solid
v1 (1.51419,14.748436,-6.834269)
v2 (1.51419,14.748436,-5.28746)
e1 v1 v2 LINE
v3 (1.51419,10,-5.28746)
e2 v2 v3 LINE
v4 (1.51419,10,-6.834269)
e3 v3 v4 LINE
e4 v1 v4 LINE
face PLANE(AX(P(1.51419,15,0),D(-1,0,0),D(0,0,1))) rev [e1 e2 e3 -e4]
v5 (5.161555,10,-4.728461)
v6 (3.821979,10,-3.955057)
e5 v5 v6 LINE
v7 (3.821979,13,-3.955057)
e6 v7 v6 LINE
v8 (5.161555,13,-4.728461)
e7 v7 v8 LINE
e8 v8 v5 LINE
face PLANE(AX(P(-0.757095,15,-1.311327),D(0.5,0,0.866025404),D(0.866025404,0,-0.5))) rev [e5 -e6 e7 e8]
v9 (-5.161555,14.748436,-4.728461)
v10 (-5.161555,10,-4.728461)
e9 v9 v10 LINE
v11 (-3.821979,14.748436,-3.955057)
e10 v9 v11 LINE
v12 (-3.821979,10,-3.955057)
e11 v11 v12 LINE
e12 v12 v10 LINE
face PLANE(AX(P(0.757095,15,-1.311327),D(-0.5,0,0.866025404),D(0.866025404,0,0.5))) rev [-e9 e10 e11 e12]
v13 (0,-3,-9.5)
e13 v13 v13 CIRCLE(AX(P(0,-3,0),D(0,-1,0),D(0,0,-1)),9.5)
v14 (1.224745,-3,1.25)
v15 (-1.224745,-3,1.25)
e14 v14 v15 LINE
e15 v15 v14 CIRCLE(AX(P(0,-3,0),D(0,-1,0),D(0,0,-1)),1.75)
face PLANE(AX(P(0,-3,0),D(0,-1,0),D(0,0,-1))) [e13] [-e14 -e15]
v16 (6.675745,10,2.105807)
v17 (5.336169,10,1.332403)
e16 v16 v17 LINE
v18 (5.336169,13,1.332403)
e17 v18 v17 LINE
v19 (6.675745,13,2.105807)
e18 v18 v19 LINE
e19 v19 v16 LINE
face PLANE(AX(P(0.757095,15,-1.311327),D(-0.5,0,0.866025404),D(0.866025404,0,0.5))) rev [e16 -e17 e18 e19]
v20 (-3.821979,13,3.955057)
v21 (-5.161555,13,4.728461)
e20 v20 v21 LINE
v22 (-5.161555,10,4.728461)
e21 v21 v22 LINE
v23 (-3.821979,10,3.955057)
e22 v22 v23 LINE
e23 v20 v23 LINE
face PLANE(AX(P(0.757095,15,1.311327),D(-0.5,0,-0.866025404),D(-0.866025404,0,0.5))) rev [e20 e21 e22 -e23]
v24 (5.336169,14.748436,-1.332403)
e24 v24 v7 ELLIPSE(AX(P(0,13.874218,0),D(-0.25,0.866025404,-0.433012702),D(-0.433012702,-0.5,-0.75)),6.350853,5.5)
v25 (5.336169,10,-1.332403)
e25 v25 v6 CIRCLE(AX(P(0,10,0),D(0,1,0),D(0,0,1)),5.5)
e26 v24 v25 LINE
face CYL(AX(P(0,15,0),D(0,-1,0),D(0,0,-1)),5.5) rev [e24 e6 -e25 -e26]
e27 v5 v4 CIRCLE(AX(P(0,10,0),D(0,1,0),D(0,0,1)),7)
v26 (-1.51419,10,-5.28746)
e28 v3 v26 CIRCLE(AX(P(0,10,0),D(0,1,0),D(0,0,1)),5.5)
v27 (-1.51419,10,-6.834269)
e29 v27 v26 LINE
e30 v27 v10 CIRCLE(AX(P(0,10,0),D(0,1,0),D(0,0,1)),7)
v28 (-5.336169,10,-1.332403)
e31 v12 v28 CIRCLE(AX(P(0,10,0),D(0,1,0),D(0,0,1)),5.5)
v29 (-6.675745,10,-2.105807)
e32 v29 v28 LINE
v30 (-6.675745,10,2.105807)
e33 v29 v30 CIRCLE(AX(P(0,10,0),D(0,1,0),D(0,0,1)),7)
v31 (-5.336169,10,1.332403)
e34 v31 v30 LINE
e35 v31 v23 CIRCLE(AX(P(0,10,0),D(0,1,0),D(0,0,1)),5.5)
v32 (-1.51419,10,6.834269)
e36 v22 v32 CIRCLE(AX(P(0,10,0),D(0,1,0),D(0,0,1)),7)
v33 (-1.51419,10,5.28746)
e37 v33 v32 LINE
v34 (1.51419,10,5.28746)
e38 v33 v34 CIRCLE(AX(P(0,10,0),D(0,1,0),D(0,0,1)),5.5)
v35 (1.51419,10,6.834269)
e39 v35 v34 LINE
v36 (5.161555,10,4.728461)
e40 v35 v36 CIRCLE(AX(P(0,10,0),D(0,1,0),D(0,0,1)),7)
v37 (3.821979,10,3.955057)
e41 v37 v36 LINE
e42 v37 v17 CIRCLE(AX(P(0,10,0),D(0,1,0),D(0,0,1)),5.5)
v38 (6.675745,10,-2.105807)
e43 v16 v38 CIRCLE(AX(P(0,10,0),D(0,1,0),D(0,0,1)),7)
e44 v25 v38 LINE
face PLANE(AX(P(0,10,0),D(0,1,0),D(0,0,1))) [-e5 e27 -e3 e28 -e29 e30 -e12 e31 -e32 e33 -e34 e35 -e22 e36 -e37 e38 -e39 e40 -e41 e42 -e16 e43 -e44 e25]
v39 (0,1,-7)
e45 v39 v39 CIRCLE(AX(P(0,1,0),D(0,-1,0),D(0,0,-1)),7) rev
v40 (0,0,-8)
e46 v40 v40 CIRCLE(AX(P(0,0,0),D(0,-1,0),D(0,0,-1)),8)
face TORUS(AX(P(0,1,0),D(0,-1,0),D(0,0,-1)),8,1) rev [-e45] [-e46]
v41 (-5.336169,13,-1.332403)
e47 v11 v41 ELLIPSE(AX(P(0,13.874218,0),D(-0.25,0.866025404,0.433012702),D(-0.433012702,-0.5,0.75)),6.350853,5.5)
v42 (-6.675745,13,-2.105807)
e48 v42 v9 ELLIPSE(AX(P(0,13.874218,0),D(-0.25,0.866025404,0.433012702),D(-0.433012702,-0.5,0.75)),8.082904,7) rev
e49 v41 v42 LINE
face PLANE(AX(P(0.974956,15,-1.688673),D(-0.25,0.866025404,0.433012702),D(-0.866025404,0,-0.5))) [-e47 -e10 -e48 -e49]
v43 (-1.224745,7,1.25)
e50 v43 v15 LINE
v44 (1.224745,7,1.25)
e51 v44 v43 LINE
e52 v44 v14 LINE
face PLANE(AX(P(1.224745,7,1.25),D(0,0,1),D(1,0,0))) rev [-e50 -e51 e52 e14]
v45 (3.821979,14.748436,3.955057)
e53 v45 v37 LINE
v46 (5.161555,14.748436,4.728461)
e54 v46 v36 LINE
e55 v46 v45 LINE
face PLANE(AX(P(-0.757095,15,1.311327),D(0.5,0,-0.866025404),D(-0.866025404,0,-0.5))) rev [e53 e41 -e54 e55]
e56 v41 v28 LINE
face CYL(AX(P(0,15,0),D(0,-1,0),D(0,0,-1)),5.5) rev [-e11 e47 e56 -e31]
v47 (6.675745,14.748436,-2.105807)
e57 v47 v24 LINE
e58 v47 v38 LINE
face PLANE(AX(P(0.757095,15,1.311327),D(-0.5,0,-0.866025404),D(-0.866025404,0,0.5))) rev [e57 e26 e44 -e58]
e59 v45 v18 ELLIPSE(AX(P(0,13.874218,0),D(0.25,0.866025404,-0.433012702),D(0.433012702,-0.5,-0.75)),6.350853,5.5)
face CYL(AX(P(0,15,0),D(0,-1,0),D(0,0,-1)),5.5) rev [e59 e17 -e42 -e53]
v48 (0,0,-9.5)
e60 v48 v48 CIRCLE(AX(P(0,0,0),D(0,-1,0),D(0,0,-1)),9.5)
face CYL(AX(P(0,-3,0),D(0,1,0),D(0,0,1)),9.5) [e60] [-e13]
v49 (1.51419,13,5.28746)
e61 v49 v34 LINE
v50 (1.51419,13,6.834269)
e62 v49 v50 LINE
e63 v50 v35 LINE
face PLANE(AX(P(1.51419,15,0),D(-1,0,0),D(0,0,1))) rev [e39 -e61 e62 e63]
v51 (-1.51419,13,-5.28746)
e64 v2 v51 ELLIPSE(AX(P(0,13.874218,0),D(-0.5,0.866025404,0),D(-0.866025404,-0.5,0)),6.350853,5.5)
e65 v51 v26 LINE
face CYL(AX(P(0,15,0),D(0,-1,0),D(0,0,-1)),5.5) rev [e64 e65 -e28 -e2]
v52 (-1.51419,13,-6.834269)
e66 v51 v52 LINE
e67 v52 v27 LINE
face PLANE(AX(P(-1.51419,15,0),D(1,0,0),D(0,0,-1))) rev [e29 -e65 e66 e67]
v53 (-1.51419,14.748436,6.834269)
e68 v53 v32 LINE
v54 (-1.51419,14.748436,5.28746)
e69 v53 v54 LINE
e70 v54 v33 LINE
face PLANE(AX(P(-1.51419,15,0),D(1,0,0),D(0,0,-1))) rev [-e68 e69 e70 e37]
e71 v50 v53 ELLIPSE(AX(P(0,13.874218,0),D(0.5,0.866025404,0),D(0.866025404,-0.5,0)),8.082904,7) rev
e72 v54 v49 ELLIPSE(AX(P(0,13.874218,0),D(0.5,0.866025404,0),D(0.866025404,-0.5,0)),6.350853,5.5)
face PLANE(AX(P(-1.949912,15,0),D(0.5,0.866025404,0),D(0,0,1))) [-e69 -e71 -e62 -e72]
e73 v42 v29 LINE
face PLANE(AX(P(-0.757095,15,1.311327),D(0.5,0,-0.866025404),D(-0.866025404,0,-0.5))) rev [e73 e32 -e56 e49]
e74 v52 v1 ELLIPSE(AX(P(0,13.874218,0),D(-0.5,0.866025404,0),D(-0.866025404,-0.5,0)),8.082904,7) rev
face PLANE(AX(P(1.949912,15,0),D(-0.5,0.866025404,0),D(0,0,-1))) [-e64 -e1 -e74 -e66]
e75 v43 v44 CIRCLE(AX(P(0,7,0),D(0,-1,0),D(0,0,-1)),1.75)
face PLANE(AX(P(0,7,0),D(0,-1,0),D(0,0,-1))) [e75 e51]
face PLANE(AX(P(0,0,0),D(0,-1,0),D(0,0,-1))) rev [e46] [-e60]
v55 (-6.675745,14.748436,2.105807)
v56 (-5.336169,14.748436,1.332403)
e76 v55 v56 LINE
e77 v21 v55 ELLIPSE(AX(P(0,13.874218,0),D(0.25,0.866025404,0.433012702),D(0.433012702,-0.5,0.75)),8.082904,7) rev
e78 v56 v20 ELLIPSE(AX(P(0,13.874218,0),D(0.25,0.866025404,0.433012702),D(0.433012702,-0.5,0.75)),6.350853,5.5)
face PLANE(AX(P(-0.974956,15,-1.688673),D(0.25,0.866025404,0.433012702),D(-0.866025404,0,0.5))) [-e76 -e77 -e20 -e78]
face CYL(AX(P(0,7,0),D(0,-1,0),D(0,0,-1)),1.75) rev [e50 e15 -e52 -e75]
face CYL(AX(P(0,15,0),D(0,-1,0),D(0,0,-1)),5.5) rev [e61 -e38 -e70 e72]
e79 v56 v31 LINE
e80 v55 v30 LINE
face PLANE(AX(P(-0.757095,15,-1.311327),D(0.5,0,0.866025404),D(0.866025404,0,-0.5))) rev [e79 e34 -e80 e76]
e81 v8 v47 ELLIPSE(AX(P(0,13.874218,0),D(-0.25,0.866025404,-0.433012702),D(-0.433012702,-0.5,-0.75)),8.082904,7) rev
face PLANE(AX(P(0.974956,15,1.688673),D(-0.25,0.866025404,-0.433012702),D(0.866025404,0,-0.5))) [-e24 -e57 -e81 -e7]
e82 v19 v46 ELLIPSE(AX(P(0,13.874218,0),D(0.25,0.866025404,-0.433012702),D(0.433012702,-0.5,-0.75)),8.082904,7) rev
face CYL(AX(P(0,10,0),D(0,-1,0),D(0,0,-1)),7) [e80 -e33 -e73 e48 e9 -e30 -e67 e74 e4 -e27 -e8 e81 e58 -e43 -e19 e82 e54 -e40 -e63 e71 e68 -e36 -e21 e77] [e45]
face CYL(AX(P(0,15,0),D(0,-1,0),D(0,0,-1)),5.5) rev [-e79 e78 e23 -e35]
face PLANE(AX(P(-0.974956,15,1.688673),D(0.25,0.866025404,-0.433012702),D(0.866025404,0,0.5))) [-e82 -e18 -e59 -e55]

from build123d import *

# Parameters (mm, degrees)
SKETCH1_R           = 7
BOSS_EXTRUDE1_DEPTH = 10
BOSS_EXTRUDE3_DEPTH = 5
CHAMFER2_SIZE       = 2
CHAMFER2_SIZE_2     = 3.464101615
SKETCH7_R           = 9.5
BOSS_EXTRUDE4_DEPTH = 3
CUT_EXTRUDE1_DEPTH  = 10
FILLET1_R           = 1


with BuildPart() as part:
    # Sketch1 → Boss-Extrude1 (new body)
    with BuildSketch(Plane(origin=(0, 0, 0), x_dir=(1, 0, 0), z_dir=(0, 1, 0))):
        with Locations(Location((0, 0, 0), (0, 0, 270))):
            Circle(SKETCH1_R)
    extrude(amount=BOSS_EXTRUDE1_DEPTH)

    # Sketch5 → Boss-Extrude3 (add)
    with BuildSketch(Plane(origin=(0, 10, 0), x_dir=(1, 0, 0), z_dir=(0, 1, 0))):
        with BuildLine():
            Line((-3.821979409, 3.955056687), (-5.161555406, 4.72846125))
            ThreePointArc((-5.161555406, 4.72846125), (-6.062177826, 3.5), (-6.675745266, 2.10580748))
            Line((-6.675745266, 2.10580748), (-5.336169269, 1.332402917))
            ThreePointArc((-5.336169269, 1.332402917), (-4.763139721, 2.75), (-3.821979409, 3.955056687))
        make_face()
        with BuildLine():
            Line((1.51418986, 5.287459604), (1.51418986, 6.83426873))
            ThreePointArc((1.51418986, 6.83426873), (0, 7), (-1.51418986, 6.83426873))
            Line((-1.51418986, 6.83426873), (-1.51418986, 5.287459604))
            ThreePointArc((-1.51418986, 5.287459604), (0, 5.5), (1.51418986, 5.287459604))
        make_face()
        with BuildLine():
            ThreePointArc((6.675745266, 2.10580748), (6.062177826, 3.5), (5.161555406, 4.72846125))
            Line((5.161555406, 4.72846125), (3.821979409, 3.955056687))
            ThreePointArc((3.821979409, 3.955056687), (4.763139721, 2.75), (5.336169269, 1.332402917))
            Line((5.336169269, 1.332402917), (6.675745266, 2.10580748))
        make_face()
        with BuildLine():
            ThreePointArc((5.161555406, -4.72846125), (6.062177826, -3.5), (6.675745266, -2.10580748))
            Line((6.675745266, -2.10580748), (5.336169269, -1.332402917))
            ThreePointArc((5.336169269, -1.332402917), (4.763139721, -2.75), (3.821979409, -3.955056687))
            Line((3.821979409, -3.955056687), (5.161555406, -4.72846125))
        make_face()
        with BuildLine():
            ThreePointArc((-1.51418986, -6.83426873), (0, -7), (1.51418986, -6.83426873))
            Line((1.51418986, -6.83426873), (1.51418986, -5.287459604))
            ThreePointArc((1.51418986, -5.287459604), (0, -5.5), (-1.51418986, -5.287459604))
            Line((-1.51418986, -5.287459604), (-1.51418986, -6.83426873))
        make_face()
        with BuildLine():
            Line((-5.336169269, -1.332402917), (-6.675745266, -2.10580748))
            ThreePointArc((-6.675745266, -2.10580748), (-6.062177826, -3.5), (-5.161555406, -4.72846125))
            Line((-5.161555406, -4.72846125), (-3.821979409, -3.955056687))
            ThreePointArc((-3.821979409, -3.955056687), (-4.763139721, -2.75), (-5.336169269, -1.332402917))
        make_face()
    extrude(amount=BOSS_EXTRUDE3_DEPTH)

    # Chamfer2
    # the kernel refuses this chamfer: 3.464101615, 2 mm, written as the material it takes off along each edge
    with BuildSketch(Plane(origin=(-1.51418986, 15, -15.796196671), x_dir=(-0.05789386240267136, -0.9983227437537926, 0), z_dir=(0, 0, 1)), Plane(origin=(12.92281267, 15, -9.20942522), x_dir=(-0.02894693120133557, -0.9983227437537926, -0.05013755556391421), z_dir=(-0.8660254037844396, 0, 0.4999999999999985)), Plane(origin=(14.43700253, 15, 6.58677145), x_dir=(0.02894693120133555, -0.9983227437537926, -0.05013755556391386), z_dir=(-0.8660254037844383, 0, -0.5000000000000009)), Plane(origin=(1.51418986, 15, 15.796196671), x_dir=(0.05789386240267136, -0.9983227437537926, 0), z_dir=(0, 0, -1)), Plane(origin=(-12.92281267, 15, 9.20942522), x_dir=(0.028946931201335627, -0.9983227437537926, 0.05013755556391417), z_dir=(0.866025403784439, 0, -0.4999999999999995)), Plane(origin=(-14.43700253, 15, -6.58677145), x_dir=(-0.028946931201335666, -0.9983227437537926, 0.05013755556391416), z_dir=(0.8660254037844386, 0, 0.5000000000000002))) as chamfer2_piece_1:
        Polygon((CHAMFER2_SIZE * 0.998322743754, CHAMFER2_SIZE * 0.0578938624027), (-CHAMFER2_SIZE_2 * 0.057893862405, CHAMFER2_SIZE_2 * 0.998322743793), (0, 0), align=None)
    extrude(amount=19.470665008, mode=Mode.SUBTRACT)

    # Sketch7 → Boss-Extrude4 (add)
    with BuildSketch(Plane.XZ):
        with Locations(Location((0, 0, 0), (0, 0, 270))):
            Circle(SKETCH7_R)
    extrude(amount=BOSS_EXTRUDE4_DEPTH)

    # Sketch6 → Cut-Extrude1 (cut)
    with BuildSketch(Plane.XZ.offset(3)):
        with BuildLine():
            Line((1.224744871, 1.25), (-1.224744871, 1.25))
            ThreePointArc((-1.224744871, 1.25), (0, -1.75), (1.224744871, 1.25))
        make_face()
    extrude(amount=-CUT_EXTRUDE1_DEPTH, mode=Mode.SUBTRACT)

    # Fillet1
    fillet1_edges = [part.edges().sort_by_distance(p)[0] for p in [
        (0, 0, -7),
    ]]
    fillet(fillet1_edges, radius=FILLET1_R)


solid = part.part
